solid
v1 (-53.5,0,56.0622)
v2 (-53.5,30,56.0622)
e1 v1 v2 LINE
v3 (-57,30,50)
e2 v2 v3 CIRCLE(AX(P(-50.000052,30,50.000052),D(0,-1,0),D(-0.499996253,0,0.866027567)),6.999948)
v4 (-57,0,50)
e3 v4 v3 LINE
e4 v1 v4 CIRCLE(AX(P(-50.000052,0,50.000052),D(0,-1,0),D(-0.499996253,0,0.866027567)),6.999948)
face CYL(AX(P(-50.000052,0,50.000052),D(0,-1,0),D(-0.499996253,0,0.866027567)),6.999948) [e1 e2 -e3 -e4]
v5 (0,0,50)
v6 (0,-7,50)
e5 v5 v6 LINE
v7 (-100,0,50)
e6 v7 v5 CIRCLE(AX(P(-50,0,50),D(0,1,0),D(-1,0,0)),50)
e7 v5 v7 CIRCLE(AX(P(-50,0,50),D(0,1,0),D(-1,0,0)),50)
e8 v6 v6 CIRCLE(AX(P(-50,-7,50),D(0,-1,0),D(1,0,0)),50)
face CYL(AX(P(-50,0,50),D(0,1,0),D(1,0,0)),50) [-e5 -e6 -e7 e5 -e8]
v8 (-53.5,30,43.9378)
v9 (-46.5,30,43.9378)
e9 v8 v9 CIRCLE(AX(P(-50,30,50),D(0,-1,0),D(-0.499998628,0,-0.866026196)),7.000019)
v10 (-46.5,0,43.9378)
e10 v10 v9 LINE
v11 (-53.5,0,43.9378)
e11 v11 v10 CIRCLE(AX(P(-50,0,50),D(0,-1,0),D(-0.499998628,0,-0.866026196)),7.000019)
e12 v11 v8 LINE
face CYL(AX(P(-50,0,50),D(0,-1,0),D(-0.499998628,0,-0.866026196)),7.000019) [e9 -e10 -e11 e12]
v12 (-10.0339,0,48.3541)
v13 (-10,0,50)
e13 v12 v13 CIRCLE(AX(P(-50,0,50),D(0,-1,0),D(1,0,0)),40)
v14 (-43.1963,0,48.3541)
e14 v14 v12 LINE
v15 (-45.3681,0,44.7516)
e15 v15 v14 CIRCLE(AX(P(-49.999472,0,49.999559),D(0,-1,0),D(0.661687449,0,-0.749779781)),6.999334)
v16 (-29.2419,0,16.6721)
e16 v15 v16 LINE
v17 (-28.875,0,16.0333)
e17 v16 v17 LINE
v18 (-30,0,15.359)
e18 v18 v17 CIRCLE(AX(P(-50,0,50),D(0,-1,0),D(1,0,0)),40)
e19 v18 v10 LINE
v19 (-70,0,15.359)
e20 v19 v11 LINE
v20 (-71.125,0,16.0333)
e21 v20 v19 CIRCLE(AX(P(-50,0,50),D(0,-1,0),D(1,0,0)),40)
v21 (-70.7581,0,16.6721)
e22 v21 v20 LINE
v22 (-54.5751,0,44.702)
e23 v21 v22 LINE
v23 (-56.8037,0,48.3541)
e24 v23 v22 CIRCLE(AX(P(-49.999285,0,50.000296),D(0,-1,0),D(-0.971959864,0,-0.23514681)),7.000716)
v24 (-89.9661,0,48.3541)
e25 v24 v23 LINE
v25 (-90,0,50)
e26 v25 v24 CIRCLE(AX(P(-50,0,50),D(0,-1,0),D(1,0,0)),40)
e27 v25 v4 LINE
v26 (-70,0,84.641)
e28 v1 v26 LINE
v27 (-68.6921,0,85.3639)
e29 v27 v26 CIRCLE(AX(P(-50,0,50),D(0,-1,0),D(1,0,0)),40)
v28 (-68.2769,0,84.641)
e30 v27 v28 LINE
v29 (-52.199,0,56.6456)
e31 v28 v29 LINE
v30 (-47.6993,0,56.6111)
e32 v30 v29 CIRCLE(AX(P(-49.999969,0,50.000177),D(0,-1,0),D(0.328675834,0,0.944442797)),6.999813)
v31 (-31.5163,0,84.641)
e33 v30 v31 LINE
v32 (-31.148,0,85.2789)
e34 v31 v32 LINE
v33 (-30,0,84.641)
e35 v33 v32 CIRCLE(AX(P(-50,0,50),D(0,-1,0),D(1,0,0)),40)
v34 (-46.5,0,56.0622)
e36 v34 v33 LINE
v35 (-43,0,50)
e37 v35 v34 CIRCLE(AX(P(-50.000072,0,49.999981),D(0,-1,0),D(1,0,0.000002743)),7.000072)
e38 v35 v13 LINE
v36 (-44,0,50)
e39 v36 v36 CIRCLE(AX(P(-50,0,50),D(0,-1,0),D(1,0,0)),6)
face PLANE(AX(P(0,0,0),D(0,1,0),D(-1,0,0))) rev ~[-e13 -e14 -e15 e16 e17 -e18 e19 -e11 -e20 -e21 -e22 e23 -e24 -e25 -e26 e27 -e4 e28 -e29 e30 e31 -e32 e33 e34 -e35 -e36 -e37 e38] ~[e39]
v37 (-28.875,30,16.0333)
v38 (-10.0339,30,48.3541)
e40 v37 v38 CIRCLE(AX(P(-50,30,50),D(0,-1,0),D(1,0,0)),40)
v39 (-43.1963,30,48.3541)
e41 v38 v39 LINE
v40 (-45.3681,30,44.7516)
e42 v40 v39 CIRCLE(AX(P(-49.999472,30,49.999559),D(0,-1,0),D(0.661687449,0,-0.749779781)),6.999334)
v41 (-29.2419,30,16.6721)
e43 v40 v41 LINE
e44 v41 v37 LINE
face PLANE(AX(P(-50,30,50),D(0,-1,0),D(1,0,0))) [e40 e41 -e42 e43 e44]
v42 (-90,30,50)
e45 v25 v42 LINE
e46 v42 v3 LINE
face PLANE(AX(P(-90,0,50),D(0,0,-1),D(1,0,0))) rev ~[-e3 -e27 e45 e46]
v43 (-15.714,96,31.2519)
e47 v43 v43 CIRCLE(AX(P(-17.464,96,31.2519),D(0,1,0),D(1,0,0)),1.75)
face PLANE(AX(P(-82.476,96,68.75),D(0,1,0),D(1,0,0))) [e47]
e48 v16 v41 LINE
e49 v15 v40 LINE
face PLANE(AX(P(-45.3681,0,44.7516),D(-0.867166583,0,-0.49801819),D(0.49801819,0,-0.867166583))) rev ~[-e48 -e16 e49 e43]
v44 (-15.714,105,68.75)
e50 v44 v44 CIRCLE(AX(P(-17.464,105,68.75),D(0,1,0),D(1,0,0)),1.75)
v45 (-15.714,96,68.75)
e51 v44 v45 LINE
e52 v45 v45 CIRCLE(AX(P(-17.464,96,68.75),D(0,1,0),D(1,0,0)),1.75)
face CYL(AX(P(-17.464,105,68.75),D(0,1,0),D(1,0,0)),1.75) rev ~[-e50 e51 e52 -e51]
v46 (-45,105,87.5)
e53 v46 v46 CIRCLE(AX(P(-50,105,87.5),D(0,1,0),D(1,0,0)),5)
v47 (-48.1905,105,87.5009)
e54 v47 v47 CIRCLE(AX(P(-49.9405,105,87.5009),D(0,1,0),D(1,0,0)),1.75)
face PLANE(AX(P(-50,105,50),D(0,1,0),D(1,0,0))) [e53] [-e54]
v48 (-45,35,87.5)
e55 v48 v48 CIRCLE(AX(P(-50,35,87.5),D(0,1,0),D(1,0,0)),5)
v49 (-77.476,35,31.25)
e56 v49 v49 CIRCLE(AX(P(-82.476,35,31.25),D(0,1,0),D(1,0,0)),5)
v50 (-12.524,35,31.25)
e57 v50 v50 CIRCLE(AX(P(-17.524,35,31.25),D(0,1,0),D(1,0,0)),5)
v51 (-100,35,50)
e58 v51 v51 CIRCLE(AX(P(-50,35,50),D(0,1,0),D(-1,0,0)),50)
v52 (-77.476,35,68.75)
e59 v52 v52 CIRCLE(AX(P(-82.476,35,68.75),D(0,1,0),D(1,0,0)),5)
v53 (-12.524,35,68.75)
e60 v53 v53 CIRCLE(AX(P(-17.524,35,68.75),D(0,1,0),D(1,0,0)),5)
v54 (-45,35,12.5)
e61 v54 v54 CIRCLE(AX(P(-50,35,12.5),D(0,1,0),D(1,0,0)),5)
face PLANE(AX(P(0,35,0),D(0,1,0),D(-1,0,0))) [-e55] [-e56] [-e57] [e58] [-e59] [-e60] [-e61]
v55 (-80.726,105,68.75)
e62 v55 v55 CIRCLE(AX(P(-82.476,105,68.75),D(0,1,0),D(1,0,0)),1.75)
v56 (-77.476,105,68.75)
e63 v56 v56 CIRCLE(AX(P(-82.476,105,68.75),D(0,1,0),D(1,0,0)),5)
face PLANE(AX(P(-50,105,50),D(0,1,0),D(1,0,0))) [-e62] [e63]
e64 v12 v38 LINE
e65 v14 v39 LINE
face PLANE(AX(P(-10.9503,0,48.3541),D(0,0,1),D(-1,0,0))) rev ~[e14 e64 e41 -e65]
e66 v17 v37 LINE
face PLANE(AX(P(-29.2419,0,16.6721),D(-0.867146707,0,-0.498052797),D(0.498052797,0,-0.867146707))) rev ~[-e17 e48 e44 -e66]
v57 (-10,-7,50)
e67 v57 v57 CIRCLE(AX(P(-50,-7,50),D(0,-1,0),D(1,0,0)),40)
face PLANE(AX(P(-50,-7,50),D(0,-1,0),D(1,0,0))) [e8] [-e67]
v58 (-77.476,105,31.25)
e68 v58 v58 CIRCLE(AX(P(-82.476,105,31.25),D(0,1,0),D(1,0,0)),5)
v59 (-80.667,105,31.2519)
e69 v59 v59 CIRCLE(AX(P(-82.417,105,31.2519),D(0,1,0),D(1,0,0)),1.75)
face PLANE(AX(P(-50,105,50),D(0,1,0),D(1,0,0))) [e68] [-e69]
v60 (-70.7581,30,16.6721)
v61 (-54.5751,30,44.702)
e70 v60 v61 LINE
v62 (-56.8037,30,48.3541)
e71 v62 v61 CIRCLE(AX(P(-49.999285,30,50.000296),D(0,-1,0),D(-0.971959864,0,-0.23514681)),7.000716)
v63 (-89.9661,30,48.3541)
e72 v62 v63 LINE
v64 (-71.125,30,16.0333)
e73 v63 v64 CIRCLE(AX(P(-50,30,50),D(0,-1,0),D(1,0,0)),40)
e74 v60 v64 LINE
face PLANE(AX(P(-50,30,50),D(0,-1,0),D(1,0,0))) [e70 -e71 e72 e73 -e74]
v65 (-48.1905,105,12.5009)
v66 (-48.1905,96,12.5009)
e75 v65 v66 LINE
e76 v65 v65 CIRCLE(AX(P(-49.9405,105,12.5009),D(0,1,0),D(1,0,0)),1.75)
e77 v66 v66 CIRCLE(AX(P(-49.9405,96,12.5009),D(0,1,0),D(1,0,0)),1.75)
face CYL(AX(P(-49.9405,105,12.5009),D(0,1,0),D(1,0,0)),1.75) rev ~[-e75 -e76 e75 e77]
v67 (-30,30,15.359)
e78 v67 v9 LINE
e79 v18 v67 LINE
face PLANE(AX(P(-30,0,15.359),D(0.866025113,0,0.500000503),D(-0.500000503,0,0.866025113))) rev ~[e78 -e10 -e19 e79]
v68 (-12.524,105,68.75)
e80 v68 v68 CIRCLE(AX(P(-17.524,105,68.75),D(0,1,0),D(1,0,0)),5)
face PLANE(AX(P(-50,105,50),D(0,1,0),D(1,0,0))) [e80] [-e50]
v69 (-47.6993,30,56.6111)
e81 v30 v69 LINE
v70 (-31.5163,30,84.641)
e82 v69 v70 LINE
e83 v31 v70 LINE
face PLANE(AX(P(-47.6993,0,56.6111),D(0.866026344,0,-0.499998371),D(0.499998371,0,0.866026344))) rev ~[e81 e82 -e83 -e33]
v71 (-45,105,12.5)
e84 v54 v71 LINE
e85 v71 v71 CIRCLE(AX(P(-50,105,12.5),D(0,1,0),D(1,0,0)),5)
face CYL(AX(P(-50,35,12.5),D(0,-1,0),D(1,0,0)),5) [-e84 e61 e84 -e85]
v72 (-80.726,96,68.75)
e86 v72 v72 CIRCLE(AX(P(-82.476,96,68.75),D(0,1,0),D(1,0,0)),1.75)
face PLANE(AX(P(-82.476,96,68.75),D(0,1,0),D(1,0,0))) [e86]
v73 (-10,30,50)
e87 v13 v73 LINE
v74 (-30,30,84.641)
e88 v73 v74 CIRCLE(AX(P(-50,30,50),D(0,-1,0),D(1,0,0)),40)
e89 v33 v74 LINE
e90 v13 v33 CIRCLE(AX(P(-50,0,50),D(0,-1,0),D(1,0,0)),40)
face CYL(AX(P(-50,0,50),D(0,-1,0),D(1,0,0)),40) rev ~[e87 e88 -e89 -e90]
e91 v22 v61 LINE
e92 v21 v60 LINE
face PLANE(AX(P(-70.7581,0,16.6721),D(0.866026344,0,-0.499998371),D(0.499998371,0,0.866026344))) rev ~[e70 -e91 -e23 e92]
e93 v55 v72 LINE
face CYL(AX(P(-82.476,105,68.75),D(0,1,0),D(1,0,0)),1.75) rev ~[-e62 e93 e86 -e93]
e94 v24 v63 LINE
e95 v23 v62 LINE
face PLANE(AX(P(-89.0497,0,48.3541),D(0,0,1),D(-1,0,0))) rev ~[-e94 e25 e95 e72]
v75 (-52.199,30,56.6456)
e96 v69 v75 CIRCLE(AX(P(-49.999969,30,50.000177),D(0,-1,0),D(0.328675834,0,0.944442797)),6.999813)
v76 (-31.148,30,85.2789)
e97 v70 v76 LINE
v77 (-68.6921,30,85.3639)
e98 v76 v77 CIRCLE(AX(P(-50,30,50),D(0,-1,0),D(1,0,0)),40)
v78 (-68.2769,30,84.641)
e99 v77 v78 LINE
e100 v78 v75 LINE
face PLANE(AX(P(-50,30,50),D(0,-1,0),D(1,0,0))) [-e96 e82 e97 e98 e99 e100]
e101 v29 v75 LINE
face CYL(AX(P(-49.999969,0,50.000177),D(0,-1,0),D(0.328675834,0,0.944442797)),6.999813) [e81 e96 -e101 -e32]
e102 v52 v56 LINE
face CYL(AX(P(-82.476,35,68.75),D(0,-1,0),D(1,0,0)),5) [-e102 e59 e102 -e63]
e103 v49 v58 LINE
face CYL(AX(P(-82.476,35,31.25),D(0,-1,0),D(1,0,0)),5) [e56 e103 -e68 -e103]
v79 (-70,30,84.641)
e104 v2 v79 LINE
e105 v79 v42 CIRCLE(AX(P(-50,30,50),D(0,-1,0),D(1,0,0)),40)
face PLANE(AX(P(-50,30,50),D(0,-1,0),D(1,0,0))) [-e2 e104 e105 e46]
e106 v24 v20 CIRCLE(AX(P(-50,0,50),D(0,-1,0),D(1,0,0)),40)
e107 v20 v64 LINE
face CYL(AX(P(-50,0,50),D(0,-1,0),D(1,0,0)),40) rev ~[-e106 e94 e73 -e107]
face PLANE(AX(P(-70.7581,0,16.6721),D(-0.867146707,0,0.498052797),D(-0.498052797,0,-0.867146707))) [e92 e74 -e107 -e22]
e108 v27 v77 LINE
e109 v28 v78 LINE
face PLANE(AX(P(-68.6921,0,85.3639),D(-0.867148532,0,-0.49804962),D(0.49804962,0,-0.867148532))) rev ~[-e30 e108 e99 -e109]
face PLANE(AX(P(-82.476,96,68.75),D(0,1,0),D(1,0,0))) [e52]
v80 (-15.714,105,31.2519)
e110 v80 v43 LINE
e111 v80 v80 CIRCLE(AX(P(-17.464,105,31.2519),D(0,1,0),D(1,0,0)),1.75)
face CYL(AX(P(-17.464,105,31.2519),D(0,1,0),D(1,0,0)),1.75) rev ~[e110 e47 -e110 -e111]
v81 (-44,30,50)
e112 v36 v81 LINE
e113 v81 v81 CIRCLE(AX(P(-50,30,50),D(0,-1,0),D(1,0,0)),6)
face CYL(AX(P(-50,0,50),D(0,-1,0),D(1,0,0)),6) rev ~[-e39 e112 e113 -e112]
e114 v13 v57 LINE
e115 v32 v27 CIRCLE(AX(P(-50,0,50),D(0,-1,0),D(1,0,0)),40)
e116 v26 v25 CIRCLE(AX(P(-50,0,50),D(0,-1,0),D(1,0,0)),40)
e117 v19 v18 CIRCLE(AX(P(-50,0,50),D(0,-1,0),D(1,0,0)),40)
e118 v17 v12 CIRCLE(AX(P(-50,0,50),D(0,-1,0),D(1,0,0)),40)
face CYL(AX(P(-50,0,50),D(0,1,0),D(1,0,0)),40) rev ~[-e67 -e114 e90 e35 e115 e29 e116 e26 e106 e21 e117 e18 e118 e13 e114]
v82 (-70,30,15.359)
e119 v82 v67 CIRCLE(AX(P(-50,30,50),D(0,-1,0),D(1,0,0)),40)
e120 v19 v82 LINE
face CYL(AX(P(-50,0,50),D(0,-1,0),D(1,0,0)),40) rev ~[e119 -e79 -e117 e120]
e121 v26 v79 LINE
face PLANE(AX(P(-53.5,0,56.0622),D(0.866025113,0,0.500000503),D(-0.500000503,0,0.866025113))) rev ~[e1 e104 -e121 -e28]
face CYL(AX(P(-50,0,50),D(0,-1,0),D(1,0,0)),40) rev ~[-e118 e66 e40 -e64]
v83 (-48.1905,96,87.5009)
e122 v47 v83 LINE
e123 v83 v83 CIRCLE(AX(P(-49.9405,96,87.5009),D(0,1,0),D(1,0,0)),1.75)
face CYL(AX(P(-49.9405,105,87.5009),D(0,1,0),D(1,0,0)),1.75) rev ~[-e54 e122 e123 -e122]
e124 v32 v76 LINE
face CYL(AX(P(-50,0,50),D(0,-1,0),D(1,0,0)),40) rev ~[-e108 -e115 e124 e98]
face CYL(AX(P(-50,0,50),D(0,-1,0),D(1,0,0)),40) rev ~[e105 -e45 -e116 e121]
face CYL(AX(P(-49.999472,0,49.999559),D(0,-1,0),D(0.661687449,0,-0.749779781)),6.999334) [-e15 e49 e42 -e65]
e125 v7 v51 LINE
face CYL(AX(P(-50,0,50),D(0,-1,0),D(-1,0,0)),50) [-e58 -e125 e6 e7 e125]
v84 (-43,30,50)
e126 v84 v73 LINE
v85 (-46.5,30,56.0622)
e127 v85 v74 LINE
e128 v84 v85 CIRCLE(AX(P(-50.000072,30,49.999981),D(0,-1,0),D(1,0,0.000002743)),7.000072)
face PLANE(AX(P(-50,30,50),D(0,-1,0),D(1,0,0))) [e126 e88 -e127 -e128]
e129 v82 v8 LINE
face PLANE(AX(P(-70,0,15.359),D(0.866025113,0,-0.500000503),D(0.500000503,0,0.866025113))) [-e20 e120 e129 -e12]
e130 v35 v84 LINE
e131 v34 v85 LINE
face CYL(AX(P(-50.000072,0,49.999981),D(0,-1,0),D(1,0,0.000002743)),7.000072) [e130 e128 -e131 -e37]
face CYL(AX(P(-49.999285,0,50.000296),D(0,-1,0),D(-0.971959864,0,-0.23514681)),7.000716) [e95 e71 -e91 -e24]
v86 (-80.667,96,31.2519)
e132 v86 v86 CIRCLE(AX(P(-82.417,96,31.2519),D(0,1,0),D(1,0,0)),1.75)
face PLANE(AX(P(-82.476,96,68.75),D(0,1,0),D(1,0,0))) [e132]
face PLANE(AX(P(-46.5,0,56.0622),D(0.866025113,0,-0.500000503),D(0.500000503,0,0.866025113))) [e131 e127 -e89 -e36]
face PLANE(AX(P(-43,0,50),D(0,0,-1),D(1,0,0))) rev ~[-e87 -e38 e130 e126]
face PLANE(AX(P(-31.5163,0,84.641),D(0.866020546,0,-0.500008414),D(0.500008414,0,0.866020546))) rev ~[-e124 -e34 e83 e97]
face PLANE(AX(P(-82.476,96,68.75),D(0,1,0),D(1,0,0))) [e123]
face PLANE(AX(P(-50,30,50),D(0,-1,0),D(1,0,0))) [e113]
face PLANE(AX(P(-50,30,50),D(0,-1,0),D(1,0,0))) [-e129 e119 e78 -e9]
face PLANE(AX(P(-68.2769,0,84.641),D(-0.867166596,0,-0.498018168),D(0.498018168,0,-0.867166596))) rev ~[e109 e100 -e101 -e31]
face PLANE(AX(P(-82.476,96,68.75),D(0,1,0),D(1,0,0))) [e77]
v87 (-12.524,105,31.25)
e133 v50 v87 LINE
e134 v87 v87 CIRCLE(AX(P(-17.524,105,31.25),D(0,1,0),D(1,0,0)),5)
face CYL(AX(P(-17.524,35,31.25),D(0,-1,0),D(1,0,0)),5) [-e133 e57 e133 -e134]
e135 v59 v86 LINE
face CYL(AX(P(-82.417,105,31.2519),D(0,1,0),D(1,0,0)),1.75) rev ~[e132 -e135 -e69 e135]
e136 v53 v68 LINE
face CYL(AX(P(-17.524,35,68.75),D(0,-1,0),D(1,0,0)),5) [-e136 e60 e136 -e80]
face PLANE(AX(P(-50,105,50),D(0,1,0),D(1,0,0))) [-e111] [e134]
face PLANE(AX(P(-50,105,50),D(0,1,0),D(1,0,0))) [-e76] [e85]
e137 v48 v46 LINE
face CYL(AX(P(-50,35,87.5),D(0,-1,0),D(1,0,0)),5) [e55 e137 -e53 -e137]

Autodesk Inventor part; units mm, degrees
ref_plane "YZ Plane" through (0, 0, 0) normal (1, 0, 0) x (0, 1, 0)
ref_plane "XZ Plane" through (0, 0, 0) normal (0, 1, 0) x (-1, 0, 0)
ref_plane "XY Plane" through (0, 0, 0) normal (0, 0, 1) x (1, 0, 0)
sketch "Boceto1" plane through (0, 0, 0) normal (0, 1, 0) x (-1, 0, 0)
  line L0 (0, 0) -> (100, 0) construction
  line L1 (100, 0) -> (100, 100) construction
  line L2 (100, 100) -> (0, 100) construction
  line L3 (0, 100) -> (0, 0) construction
  line L4 (0, 100) -> (100, 0) construction
  line L5 (100, 100) -> (0, 0) construction
  circle A0 centre (50, 50) radius 50
  dimension "d2" = 100
extrude "Extrusión1" add sketch "Boceto1" along normal blind 35
sketch "Boceto2" plane through (-50, 35, 50) normal (0, 1, 0) x (1, 0, 0)
  circle A0 centre (0, 0) radius 37.5 construction
  line L0 (0, 37.5) -> (32.476, 18.75) construction
  line L1 (32.476, 18.75) -> (32.476, -18.75) construction
  line L2 (32.476, -18.75) -> (0, -37.5) construction
  line L3 (0, -37.5) -> (-32.476, -18.75) construction
  line L4 (-32.476, -18.75) -> (-32.476, 18.75) construction
  line L5 (-32.476, 18.75) -> (0, 37.5) construction
  circle A1 centre (0, 37.5) radius 5
  circle A2 centre (32.476, 18.75) radius 5
  circle A3 centre (32.476, -18.75) radius 5
  circle A4 centre (0, -37.5) radius 5
  circle A5 centre (-32.476, -18.75) radius 5
  circle A6 centre (-32.476, 18.75) radius 5
  point P0 (50, 50)
  dimension "d5" = 75
  dimension "d6" = 10
  dimension "d7" = 10
  dimension "d8" = 10
  dimension "d9" = 10
  dimension "d10" = 10
  dimension "d11" = 10
extrude "Extrusión2" add sketch "Boceto2" along normal blind 70
sketch "Boceto3" plane through (-82.476, 105, 68.75) normal (0, 1, 0) x (1, 0, 0)
  circle A0 centre (32.5355, 18.7491) radius 37.5 construction
  circle A1 centre (32.5355, -18.7509) radius 1.75
  circle A2 centre (65.012, 0) radius 1.75
  circle A3 centre (65.012, 37.4981) radius 1.75
  circle A4 centre (32.5355, 56.2491) radius 1.75
  circle A5 centre (0.059, 37.4981) radius 1.75
  circle A6 centre (0, 0) radius 5 projected
  circle A7 centre (0, 0) radius 1.75
  point P0 (82.476, 68.75)
  dimension "d15" = 3.5
  dimension "d16" = 3.5
  dimension "d17" = 3.5
  dimension "d18" = 3.5
  dimension "d19" = 3.5
  dimension "d20" = 3.5
extrude "Extrusión3" cut sketch "Boceto3" against normal blind 9 contours A1 | A2 | A3 | A4 | A5 | A7
sketch "Boceto4" plane through (-50, 0, 50) normal (0, -1, 0) x (1, 0, 0)
  circle A0 centre (0, 0) radius 40
  circle A1 centre (0, 0) radius 6
  line L0 (-20, -34.641) -> (-3.5, -6.0622)
  line L1 (-20.7581, -33.3279) -> (-4.5751, -5.298)
  line L2 (20, -34.641) -> (3.5, -6.0622)
  line L3 (-18.2769, 34.641) -> (-2.199, 6.6456)
  line L4 (4.6319, -5.2484) -> (20.7581, -33.3279)
  line L5 (39.0497, -1.6459) -> (6.8037, -1.6459)
  line L6 (7, 0) -> (40, 0)
  line L7 (3.5, 6.0622) -> (20, 34.641)
  line L8 (2.3007, 6.6111) -> (18.4837, 34.641)
  arc A2 (2.3007, 6.6111) -> (-2.199, 6.6456) centre (0, 0) ccw
  arc A3 (-3.5, 6.0622) -> (-7, 0) centre (0, 0) ccw
  line L9 (-6.8037, -1.6459) -> (-39.0497, -1.6459)
  arc A4 (-6.8037, -1.6459) -> (-4.5751, -5.298) centre (0, 0) ccw
  line L10 (-40, 0) -> (-7, 0)
  arc A5 (-3.5, -6.0622) -> (3.5, -6.0622) centre (0, 0) ccw
  arc A6 (4.6319, -5.2484) -> (6.8037, -1.6459) centre (0, 0) ccw
  arc A7 (7, 0) -> (3.5, 6.0622) centre (0, 0) ccw
  line L11 (-3.5, 6.0622) -> (-20, 34.641)
  line L12 (20.7581, -33.3279) -> (21.125, -33.9667)
  line L13 (39.0497, -1.6459) -> (39.9661, -1.6459)
  line L14 (18.4837, 34.641) -> (18.852, 35.2789)
  line L15 (-18.6921, 35.3639) -> (-18.2769, 34.641)
  line L16 (-39.0497, -1.6459) -> (-39.9661, -1.6459)
  line L17 (-20.7581, -33.3279) -> (-21.125, -33.9667)
  point P0 (50, -50)
  point P1 (-20, -34.641)
  point P2 (20, 34.641)
  point P3 (-20, 34.641)
  dimension "d23" = 80
  dimension "d24" = 12
extrude "Extrusión4" cut sketch "Boceto4" against normal blind 30 contours L6 A7 L7 A0 | A0 L12 L4 A6 L5 L13 | L14 L8 A2 L3 L15 A0 | A0 L0 A5 L2 | L11 A3 L10 A0 | A0 L16 L9 A4 L1 L17 | A1
sketch "Boceto5" plane through (-50, 0, 50) normal (0, -1, 0) x (1, 0, 0)
  arc A0 (-3.5, 6.0622) -> (-7, 0) centre (0, 0) ccw projected
  circle A1 centre (0, 0) radius 50
  circle A2 centre (0, 0) radius 40
  point P0 (50, -50)
  dimension "d28" = 100
  dimension "d29" = 80
extrude "Extrusión5" add sketch "Boceto5" along normal blind 7
thread "Rosca1" size "M80x1.5" class "6H" standard "ANSI Metric M Profile" length 6
